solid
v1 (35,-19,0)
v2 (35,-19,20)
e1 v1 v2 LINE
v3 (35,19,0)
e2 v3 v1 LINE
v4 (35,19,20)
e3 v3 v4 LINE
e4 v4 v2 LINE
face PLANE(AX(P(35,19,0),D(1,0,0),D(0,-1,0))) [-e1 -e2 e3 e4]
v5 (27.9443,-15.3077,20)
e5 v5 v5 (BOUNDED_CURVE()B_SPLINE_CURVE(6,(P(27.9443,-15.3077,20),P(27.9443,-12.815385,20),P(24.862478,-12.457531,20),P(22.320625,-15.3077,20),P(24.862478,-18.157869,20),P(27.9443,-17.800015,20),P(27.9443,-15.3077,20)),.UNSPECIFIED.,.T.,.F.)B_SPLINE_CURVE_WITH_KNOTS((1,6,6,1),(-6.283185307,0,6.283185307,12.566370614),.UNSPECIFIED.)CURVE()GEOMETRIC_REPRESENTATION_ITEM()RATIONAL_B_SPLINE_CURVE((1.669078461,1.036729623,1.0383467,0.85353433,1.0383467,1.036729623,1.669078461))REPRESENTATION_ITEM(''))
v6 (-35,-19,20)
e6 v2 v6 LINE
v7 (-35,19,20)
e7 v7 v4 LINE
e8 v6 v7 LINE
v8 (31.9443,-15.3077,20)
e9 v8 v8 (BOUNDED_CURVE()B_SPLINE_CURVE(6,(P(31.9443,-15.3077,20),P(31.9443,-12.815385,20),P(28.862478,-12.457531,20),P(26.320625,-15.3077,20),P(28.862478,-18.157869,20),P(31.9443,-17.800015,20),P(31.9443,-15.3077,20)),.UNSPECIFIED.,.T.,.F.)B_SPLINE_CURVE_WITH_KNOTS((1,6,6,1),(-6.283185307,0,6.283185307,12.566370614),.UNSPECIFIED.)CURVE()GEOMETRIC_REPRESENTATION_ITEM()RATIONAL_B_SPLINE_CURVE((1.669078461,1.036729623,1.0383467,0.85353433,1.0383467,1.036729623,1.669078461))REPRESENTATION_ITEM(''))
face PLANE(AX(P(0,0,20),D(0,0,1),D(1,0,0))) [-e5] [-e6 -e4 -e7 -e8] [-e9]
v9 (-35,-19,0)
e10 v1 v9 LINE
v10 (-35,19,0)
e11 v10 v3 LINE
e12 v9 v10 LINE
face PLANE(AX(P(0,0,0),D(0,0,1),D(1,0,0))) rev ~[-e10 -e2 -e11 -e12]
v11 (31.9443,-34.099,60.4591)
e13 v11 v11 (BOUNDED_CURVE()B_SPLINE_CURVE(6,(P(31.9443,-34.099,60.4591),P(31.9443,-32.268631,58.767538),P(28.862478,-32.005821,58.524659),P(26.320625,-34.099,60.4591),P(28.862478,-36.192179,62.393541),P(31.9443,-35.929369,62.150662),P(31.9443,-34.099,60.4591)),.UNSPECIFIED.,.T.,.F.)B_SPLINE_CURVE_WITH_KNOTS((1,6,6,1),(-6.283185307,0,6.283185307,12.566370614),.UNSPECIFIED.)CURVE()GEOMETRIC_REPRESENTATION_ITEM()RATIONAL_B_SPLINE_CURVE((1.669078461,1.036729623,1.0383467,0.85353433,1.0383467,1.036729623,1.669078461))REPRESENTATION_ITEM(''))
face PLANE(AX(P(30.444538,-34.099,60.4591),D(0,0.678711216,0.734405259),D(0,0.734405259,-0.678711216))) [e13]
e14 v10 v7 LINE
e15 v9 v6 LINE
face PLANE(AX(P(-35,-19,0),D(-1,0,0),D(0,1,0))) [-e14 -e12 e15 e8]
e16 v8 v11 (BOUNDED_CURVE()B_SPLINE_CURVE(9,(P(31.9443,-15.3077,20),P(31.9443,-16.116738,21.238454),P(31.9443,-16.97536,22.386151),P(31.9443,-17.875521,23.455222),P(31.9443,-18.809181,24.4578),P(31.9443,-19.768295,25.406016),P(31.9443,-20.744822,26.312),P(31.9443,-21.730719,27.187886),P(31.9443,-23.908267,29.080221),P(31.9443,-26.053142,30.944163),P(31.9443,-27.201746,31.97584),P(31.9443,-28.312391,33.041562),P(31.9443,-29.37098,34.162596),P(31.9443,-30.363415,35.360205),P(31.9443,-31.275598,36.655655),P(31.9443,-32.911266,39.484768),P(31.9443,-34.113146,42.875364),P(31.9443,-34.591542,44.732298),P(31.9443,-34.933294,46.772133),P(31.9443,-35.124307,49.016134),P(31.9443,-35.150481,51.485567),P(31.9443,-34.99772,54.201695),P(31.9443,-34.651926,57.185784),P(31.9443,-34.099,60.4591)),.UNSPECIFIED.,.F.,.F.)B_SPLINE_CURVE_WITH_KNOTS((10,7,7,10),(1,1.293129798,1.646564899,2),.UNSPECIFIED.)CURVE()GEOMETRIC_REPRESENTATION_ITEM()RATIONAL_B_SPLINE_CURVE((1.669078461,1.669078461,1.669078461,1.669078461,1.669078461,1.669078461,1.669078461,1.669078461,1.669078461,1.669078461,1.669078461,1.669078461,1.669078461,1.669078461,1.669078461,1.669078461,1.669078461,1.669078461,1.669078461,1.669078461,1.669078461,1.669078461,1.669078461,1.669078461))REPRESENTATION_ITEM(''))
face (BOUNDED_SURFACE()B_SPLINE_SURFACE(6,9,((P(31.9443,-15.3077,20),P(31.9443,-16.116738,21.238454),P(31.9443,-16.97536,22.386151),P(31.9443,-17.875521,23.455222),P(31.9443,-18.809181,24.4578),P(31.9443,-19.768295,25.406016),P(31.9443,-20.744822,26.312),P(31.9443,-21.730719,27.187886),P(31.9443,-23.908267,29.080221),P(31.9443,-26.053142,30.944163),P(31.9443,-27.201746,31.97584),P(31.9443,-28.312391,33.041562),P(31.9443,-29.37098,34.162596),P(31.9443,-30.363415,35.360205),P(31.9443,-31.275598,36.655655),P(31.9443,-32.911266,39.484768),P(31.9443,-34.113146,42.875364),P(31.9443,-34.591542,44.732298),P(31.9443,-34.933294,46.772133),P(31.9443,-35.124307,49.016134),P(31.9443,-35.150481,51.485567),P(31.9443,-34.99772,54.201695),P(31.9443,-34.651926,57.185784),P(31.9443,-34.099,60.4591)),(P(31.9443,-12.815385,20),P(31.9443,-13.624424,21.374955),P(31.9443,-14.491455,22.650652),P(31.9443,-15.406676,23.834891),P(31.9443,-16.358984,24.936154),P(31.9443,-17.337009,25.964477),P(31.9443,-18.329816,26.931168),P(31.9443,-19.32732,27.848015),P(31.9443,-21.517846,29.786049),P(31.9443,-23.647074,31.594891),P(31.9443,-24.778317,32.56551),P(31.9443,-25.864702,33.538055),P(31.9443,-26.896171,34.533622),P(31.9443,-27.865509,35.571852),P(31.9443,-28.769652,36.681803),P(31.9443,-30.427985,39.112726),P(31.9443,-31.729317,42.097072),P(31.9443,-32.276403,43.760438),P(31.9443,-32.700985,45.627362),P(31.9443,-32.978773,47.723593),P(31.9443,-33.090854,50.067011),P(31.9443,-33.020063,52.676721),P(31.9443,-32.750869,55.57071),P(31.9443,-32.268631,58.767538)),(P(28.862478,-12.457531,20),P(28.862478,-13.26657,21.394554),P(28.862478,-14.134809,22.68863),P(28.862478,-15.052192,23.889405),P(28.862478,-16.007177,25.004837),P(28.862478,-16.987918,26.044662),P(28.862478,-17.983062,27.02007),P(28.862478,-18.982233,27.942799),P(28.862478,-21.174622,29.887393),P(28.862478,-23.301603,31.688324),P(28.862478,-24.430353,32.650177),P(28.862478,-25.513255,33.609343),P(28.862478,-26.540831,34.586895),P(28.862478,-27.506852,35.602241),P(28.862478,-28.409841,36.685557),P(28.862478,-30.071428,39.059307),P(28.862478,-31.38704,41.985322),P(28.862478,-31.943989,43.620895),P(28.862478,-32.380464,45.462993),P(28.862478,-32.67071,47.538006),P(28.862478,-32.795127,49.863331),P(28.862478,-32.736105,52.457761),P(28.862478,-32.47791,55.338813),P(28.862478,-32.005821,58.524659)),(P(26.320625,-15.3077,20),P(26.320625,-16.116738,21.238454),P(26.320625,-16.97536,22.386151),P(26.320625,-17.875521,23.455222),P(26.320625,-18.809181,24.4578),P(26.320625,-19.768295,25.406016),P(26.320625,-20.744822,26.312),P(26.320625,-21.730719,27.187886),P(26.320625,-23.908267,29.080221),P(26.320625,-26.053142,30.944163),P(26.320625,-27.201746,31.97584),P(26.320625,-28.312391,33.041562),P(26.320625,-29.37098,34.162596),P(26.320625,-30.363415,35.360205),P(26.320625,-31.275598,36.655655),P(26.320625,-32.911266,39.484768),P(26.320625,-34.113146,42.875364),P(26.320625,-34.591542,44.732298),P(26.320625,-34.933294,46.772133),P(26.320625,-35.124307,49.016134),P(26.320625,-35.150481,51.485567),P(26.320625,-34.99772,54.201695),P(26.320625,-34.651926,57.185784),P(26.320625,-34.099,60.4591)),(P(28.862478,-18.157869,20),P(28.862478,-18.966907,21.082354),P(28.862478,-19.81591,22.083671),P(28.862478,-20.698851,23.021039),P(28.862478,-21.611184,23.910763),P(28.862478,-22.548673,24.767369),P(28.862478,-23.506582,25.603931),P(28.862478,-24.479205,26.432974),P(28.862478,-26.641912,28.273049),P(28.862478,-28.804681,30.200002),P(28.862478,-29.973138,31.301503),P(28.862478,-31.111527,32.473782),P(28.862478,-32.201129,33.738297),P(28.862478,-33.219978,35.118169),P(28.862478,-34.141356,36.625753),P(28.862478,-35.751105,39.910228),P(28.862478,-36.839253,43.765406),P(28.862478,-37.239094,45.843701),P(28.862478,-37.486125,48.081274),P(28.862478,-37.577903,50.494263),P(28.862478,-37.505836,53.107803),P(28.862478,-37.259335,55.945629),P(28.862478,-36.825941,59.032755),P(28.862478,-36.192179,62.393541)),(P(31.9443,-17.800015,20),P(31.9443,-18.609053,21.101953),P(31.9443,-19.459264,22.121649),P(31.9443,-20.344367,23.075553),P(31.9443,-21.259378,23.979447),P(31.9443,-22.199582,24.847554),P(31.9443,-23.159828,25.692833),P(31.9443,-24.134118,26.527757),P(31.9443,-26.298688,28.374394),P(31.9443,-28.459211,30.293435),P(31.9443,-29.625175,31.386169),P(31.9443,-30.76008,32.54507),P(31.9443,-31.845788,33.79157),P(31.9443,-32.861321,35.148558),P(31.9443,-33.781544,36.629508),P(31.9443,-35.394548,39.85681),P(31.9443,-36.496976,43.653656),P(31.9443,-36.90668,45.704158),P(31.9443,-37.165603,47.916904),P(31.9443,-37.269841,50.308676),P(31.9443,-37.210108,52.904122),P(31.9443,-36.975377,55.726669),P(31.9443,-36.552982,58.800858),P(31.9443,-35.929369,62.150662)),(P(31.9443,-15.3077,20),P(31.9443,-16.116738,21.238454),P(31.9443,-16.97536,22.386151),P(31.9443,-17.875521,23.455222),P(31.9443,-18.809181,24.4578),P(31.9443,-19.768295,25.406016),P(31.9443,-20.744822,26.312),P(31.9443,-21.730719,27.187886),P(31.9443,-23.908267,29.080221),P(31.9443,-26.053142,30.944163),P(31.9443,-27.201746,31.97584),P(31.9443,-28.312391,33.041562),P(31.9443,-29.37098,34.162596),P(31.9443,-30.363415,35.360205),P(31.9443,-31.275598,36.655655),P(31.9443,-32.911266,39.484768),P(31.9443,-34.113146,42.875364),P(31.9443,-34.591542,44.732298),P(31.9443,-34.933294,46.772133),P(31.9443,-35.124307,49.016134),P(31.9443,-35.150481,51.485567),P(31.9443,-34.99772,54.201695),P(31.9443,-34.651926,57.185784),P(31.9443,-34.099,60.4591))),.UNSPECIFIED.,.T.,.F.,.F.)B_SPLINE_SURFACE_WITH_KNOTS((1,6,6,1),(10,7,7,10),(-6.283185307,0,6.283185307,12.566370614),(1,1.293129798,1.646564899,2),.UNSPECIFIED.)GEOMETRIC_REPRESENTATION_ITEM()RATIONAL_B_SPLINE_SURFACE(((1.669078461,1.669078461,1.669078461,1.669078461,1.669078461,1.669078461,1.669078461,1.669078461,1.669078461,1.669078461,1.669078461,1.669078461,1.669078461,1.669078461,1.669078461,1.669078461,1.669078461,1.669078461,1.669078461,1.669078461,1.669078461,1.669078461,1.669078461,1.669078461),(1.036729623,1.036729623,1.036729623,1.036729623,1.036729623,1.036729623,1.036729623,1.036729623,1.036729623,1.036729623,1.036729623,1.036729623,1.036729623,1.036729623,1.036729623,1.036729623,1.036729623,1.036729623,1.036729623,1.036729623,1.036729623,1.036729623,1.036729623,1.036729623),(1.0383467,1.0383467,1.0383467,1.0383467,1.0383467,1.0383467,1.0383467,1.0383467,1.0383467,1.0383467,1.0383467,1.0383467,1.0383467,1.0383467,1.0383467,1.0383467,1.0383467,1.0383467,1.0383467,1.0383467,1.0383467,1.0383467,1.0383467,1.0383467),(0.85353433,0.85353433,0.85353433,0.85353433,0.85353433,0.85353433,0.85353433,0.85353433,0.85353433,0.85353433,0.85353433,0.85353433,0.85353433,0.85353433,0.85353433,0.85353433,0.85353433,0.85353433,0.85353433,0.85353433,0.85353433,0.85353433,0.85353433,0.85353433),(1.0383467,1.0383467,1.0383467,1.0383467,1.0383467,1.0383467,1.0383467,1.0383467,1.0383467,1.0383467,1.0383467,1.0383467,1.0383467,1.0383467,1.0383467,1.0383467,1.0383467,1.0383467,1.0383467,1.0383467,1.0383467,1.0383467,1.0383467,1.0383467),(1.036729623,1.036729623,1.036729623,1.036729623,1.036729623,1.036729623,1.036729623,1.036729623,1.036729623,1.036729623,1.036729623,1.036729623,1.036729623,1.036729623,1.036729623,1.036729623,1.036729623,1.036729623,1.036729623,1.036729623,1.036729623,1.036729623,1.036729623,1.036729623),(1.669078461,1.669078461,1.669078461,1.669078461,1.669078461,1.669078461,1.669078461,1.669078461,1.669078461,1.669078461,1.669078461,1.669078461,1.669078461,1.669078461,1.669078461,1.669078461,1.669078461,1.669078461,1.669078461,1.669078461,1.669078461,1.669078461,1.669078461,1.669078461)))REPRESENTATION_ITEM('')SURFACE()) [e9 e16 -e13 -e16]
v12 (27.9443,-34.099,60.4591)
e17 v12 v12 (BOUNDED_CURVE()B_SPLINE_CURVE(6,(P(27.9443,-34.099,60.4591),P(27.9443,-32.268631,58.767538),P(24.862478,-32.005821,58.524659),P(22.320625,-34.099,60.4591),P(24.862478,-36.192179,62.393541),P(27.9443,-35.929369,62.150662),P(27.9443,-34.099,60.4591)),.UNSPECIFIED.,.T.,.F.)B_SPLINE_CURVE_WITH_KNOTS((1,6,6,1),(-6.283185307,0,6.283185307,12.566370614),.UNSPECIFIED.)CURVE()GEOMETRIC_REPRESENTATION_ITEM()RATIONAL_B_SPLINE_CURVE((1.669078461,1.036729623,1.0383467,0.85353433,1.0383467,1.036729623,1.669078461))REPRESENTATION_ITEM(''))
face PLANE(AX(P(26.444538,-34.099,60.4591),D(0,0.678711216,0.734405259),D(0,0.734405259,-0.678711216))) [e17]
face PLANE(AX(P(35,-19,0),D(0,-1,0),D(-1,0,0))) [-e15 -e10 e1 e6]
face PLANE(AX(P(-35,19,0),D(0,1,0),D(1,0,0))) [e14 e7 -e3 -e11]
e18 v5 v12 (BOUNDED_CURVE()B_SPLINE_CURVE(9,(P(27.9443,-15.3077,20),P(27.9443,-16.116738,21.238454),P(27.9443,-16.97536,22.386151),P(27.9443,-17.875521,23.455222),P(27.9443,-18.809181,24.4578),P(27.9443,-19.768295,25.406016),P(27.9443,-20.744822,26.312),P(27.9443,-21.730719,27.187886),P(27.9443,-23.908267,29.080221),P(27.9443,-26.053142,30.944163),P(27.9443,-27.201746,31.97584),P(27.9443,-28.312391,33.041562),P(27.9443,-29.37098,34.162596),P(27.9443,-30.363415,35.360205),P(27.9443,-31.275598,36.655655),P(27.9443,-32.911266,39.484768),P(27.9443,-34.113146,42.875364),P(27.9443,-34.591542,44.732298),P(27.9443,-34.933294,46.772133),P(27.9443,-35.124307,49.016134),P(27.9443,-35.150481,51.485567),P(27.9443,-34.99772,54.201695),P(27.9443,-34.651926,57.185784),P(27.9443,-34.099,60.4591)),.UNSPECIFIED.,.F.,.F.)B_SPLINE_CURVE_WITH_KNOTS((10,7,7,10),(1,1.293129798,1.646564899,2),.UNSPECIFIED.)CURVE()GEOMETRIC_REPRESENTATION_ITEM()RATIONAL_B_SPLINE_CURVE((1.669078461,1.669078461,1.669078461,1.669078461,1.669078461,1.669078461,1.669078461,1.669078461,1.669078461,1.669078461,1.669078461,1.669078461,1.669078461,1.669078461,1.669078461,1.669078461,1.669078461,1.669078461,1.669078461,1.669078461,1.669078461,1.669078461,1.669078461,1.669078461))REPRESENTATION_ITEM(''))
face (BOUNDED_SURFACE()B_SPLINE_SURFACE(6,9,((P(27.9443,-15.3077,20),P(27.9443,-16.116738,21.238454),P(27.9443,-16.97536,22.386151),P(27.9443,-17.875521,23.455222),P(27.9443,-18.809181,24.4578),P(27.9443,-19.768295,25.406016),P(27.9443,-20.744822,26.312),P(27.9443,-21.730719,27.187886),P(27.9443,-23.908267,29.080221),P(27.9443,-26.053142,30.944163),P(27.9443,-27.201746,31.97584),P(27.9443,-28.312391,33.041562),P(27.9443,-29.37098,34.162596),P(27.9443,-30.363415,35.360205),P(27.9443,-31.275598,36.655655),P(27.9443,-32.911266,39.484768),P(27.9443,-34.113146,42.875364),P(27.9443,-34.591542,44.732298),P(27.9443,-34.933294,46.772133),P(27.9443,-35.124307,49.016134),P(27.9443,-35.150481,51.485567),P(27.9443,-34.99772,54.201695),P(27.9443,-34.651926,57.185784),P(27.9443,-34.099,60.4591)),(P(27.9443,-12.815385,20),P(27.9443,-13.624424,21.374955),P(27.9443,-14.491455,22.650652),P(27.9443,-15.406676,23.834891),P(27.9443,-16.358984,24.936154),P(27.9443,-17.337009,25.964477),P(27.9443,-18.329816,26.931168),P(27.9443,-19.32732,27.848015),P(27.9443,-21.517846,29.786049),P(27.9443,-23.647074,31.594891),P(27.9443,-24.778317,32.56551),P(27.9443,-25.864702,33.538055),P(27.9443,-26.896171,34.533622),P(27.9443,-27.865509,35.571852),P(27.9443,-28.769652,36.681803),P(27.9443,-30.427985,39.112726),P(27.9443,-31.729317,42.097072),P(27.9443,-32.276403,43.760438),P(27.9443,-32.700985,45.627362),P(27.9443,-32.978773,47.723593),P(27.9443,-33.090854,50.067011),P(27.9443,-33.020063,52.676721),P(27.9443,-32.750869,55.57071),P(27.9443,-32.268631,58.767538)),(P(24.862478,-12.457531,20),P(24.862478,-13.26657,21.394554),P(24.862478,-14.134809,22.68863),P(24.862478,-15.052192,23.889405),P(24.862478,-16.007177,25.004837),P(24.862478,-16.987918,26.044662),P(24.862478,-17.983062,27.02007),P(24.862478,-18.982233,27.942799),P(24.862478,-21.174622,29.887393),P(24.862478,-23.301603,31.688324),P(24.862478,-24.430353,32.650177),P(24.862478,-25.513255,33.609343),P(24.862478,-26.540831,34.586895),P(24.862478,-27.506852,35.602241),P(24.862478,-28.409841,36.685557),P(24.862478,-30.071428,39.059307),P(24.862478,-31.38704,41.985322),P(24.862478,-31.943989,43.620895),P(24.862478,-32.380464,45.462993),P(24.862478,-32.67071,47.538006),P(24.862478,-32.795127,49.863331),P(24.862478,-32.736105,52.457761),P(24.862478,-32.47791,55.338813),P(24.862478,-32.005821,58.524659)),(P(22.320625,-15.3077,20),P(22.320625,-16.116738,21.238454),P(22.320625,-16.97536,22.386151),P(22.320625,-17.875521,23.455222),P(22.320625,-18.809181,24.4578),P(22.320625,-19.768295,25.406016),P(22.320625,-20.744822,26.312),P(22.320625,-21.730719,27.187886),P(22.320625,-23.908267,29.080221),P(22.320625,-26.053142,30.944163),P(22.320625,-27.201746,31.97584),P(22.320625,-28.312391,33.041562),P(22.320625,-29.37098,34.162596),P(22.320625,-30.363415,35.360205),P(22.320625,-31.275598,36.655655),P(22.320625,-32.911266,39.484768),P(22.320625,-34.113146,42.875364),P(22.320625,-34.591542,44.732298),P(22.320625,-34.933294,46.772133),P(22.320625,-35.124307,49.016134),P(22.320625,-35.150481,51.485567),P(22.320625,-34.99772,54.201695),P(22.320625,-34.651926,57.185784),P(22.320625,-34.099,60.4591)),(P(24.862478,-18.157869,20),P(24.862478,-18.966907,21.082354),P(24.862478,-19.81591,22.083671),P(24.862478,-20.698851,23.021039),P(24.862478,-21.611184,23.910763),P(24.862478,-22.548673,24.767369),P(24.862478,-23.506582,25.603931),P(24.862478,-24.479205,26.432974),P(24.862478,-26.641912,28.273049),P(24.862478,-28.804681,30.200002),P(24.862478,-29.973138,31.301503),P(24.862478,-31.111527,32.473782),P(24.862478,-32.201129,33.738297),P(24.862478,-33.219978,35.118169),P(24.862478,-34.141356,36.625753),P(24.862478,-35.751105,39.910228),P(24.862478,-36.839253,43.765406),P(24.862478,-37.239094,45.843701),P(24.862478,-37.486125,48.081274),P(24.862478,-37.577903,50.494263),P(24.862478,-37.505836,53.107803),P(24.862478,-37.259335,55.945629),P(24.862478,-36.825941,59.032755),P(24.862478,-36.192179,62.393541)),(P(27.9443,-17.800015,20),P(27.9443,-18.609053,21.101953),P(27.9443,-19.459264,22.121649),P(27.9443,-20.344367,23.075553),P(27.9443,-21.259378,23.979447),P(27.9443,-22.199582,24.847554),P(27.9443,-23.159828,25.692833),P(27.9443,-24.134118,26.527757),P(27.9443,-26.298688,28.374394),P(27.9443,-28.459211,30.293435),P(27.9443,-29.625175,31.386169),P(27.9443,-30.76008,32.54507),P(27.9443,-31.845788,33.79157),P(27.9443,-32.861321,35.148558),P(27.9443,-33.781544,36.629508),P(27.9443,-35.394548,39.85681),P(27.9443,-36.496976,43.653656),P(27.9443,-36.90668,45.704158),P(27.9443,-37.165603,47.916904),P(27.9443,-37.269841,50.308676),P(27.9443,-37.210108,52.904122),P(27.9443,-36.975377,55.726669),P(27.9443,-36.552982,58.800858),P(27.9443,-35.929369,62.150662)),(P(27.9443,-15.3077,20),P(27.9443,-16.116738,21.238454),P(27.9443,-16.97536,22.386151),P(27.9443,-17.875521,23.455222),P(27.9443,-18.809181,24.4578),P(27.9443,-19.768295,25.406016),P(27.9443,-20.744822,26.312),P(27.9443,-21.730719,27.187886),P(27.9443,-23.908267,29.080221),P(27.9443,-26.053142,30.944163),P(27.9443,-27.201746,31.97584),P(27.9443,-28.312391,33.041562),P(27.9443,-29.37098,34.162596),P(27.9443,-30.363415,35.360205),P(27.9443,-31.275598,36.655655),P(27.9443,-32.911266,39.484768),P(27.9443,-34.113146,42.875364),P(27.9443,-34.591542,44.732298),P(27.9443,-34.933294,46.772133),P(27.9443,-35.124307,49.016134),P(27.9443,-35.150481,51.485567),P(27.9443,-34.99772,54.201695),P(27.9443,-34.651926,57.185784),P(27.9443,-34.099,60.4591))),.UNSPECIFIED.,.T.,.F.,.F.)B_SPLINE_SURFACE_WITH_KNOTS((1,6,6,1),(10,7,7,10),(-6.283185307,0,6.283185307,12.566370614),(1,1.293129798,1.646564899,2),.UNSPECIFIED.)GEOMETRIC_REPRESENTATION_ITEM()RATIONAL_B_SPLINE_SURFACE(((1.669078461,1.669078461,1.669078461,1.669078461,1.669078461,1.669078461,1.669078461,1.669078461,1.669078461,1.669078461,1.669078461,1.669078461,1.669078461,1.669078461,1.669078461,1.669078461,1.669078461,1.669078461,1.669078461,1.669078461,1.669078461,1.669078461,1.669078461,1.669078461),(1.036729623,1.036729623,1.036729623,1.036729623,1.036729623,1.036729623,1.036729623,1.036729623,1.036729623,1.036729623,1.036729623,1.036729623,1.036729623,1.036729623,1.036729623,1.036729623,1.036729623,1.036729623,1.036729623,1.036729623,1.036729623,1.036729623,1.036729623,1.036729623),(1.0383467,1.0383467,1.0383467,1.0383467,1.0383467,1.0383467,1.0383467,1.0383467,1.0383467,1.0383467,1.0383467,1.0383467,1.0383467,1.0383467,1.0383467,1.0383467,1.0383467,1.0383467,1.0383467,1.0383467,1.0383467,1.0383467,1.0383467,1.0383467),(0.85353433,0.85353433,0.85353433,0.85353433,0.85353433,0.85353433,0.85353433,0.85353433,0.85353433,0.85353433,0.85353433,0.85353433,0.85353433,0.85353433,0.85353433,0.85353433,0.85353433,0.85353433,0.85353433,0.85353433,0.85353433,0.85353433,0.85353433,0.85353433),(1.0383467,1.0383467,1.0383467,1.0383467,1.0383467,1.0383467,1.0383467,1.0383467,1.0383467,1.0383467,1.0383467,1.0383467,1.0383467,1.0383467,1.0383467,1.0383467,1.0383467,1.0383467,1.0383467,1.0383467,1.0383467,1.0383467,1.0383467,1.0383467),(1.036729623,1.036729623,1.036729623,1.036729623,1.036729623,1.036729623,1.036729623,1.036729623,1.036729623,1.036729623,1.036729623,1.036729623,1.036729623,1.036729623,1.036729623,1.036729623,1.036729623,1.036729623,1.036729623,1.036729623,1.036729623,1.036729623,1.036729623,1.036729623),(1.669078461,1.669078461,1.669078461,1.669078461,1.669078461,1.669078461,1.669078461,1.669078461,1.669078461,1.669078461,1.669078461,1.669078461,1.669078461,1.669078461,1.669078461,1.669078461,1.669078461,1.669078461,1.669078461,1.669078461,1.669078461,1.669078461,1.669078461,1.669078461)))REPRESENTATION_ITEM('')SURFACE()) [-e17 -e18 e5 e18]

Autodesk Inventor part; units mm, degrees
ref_plane "YZ Plane" through (0, 0, 0) normal (1, 0, 0) x (0, 1, 0)
ref_plane "XZ Plane" through (0, 0, 0) normal (0, 1, 0) x (-1, 0, 0)
sketch "Sketch1" plane through (0, 0, 0) normal (0, 0, 1) x (1, 0, 0)
  line L0 (-35, 19) -> (35, 19)
  line L1 (35, 19) -> (35, -19)
  line L2 (35, -19) -> (-35, -19)
  line L3 (-35, -19) -> (-35, 19)
  line L4 (-35, 19) -> (35, -19) construction
  line L5 (35, 19) -> (-35, -19) construction
  point P0 (0, 0)
  dimension "d0" = 70
  dimension "d1" = 38
extrude "Extrusion1" add sketch "Sketch1" along normal blind 20
sketch "Sketch2" plane through (0, 0, 20) normal (0, 0, 1) x (1, 0, 0)
  circle A0 centre (26.4443, -15.3077) radius 1.5
  circle A1 centre (30.4443, -15.3077) radius 1.5
  point P0 (0, 0)
  dimension "d4" = 3
  dimension "d5" = 3
  dimension "d6" = 4
ref_plane "Work Plane2" through (26.4443, -15.3077, 20) normal (1, 0, 0) x (0, 1, 0)
sketch "Sketch3" plane through (26.4443, -15.3077, 20) normal (1, 0, 0) x (0, 1, 0)
  line L0 (0, 0) -> (-8.28, 12.6748) construction
  line L1 (-8.28, 12.6748) -> (-23.4846, 12.6748) construction
  line L2 (-23.4846, 12.6748) -> (-18.7913, 40.4591) construction
  spline S0 degree 3 poles (0, 0) (-8.28, 12.6748) (-23.4846, 12.6748) (-18.7913, 40.4591) knots 1 1 1 1 2 2 2 2
  point P0 (15.3077, -20)
sweep "Sweep1" add profiles "Sketch2" path "Sketch3" contours A0
pattern_linear "Rectangular Pattern1" count 2 spacing 4 along (1, 0, 0) of "Sweep1"
properties part number "battery_5V"
